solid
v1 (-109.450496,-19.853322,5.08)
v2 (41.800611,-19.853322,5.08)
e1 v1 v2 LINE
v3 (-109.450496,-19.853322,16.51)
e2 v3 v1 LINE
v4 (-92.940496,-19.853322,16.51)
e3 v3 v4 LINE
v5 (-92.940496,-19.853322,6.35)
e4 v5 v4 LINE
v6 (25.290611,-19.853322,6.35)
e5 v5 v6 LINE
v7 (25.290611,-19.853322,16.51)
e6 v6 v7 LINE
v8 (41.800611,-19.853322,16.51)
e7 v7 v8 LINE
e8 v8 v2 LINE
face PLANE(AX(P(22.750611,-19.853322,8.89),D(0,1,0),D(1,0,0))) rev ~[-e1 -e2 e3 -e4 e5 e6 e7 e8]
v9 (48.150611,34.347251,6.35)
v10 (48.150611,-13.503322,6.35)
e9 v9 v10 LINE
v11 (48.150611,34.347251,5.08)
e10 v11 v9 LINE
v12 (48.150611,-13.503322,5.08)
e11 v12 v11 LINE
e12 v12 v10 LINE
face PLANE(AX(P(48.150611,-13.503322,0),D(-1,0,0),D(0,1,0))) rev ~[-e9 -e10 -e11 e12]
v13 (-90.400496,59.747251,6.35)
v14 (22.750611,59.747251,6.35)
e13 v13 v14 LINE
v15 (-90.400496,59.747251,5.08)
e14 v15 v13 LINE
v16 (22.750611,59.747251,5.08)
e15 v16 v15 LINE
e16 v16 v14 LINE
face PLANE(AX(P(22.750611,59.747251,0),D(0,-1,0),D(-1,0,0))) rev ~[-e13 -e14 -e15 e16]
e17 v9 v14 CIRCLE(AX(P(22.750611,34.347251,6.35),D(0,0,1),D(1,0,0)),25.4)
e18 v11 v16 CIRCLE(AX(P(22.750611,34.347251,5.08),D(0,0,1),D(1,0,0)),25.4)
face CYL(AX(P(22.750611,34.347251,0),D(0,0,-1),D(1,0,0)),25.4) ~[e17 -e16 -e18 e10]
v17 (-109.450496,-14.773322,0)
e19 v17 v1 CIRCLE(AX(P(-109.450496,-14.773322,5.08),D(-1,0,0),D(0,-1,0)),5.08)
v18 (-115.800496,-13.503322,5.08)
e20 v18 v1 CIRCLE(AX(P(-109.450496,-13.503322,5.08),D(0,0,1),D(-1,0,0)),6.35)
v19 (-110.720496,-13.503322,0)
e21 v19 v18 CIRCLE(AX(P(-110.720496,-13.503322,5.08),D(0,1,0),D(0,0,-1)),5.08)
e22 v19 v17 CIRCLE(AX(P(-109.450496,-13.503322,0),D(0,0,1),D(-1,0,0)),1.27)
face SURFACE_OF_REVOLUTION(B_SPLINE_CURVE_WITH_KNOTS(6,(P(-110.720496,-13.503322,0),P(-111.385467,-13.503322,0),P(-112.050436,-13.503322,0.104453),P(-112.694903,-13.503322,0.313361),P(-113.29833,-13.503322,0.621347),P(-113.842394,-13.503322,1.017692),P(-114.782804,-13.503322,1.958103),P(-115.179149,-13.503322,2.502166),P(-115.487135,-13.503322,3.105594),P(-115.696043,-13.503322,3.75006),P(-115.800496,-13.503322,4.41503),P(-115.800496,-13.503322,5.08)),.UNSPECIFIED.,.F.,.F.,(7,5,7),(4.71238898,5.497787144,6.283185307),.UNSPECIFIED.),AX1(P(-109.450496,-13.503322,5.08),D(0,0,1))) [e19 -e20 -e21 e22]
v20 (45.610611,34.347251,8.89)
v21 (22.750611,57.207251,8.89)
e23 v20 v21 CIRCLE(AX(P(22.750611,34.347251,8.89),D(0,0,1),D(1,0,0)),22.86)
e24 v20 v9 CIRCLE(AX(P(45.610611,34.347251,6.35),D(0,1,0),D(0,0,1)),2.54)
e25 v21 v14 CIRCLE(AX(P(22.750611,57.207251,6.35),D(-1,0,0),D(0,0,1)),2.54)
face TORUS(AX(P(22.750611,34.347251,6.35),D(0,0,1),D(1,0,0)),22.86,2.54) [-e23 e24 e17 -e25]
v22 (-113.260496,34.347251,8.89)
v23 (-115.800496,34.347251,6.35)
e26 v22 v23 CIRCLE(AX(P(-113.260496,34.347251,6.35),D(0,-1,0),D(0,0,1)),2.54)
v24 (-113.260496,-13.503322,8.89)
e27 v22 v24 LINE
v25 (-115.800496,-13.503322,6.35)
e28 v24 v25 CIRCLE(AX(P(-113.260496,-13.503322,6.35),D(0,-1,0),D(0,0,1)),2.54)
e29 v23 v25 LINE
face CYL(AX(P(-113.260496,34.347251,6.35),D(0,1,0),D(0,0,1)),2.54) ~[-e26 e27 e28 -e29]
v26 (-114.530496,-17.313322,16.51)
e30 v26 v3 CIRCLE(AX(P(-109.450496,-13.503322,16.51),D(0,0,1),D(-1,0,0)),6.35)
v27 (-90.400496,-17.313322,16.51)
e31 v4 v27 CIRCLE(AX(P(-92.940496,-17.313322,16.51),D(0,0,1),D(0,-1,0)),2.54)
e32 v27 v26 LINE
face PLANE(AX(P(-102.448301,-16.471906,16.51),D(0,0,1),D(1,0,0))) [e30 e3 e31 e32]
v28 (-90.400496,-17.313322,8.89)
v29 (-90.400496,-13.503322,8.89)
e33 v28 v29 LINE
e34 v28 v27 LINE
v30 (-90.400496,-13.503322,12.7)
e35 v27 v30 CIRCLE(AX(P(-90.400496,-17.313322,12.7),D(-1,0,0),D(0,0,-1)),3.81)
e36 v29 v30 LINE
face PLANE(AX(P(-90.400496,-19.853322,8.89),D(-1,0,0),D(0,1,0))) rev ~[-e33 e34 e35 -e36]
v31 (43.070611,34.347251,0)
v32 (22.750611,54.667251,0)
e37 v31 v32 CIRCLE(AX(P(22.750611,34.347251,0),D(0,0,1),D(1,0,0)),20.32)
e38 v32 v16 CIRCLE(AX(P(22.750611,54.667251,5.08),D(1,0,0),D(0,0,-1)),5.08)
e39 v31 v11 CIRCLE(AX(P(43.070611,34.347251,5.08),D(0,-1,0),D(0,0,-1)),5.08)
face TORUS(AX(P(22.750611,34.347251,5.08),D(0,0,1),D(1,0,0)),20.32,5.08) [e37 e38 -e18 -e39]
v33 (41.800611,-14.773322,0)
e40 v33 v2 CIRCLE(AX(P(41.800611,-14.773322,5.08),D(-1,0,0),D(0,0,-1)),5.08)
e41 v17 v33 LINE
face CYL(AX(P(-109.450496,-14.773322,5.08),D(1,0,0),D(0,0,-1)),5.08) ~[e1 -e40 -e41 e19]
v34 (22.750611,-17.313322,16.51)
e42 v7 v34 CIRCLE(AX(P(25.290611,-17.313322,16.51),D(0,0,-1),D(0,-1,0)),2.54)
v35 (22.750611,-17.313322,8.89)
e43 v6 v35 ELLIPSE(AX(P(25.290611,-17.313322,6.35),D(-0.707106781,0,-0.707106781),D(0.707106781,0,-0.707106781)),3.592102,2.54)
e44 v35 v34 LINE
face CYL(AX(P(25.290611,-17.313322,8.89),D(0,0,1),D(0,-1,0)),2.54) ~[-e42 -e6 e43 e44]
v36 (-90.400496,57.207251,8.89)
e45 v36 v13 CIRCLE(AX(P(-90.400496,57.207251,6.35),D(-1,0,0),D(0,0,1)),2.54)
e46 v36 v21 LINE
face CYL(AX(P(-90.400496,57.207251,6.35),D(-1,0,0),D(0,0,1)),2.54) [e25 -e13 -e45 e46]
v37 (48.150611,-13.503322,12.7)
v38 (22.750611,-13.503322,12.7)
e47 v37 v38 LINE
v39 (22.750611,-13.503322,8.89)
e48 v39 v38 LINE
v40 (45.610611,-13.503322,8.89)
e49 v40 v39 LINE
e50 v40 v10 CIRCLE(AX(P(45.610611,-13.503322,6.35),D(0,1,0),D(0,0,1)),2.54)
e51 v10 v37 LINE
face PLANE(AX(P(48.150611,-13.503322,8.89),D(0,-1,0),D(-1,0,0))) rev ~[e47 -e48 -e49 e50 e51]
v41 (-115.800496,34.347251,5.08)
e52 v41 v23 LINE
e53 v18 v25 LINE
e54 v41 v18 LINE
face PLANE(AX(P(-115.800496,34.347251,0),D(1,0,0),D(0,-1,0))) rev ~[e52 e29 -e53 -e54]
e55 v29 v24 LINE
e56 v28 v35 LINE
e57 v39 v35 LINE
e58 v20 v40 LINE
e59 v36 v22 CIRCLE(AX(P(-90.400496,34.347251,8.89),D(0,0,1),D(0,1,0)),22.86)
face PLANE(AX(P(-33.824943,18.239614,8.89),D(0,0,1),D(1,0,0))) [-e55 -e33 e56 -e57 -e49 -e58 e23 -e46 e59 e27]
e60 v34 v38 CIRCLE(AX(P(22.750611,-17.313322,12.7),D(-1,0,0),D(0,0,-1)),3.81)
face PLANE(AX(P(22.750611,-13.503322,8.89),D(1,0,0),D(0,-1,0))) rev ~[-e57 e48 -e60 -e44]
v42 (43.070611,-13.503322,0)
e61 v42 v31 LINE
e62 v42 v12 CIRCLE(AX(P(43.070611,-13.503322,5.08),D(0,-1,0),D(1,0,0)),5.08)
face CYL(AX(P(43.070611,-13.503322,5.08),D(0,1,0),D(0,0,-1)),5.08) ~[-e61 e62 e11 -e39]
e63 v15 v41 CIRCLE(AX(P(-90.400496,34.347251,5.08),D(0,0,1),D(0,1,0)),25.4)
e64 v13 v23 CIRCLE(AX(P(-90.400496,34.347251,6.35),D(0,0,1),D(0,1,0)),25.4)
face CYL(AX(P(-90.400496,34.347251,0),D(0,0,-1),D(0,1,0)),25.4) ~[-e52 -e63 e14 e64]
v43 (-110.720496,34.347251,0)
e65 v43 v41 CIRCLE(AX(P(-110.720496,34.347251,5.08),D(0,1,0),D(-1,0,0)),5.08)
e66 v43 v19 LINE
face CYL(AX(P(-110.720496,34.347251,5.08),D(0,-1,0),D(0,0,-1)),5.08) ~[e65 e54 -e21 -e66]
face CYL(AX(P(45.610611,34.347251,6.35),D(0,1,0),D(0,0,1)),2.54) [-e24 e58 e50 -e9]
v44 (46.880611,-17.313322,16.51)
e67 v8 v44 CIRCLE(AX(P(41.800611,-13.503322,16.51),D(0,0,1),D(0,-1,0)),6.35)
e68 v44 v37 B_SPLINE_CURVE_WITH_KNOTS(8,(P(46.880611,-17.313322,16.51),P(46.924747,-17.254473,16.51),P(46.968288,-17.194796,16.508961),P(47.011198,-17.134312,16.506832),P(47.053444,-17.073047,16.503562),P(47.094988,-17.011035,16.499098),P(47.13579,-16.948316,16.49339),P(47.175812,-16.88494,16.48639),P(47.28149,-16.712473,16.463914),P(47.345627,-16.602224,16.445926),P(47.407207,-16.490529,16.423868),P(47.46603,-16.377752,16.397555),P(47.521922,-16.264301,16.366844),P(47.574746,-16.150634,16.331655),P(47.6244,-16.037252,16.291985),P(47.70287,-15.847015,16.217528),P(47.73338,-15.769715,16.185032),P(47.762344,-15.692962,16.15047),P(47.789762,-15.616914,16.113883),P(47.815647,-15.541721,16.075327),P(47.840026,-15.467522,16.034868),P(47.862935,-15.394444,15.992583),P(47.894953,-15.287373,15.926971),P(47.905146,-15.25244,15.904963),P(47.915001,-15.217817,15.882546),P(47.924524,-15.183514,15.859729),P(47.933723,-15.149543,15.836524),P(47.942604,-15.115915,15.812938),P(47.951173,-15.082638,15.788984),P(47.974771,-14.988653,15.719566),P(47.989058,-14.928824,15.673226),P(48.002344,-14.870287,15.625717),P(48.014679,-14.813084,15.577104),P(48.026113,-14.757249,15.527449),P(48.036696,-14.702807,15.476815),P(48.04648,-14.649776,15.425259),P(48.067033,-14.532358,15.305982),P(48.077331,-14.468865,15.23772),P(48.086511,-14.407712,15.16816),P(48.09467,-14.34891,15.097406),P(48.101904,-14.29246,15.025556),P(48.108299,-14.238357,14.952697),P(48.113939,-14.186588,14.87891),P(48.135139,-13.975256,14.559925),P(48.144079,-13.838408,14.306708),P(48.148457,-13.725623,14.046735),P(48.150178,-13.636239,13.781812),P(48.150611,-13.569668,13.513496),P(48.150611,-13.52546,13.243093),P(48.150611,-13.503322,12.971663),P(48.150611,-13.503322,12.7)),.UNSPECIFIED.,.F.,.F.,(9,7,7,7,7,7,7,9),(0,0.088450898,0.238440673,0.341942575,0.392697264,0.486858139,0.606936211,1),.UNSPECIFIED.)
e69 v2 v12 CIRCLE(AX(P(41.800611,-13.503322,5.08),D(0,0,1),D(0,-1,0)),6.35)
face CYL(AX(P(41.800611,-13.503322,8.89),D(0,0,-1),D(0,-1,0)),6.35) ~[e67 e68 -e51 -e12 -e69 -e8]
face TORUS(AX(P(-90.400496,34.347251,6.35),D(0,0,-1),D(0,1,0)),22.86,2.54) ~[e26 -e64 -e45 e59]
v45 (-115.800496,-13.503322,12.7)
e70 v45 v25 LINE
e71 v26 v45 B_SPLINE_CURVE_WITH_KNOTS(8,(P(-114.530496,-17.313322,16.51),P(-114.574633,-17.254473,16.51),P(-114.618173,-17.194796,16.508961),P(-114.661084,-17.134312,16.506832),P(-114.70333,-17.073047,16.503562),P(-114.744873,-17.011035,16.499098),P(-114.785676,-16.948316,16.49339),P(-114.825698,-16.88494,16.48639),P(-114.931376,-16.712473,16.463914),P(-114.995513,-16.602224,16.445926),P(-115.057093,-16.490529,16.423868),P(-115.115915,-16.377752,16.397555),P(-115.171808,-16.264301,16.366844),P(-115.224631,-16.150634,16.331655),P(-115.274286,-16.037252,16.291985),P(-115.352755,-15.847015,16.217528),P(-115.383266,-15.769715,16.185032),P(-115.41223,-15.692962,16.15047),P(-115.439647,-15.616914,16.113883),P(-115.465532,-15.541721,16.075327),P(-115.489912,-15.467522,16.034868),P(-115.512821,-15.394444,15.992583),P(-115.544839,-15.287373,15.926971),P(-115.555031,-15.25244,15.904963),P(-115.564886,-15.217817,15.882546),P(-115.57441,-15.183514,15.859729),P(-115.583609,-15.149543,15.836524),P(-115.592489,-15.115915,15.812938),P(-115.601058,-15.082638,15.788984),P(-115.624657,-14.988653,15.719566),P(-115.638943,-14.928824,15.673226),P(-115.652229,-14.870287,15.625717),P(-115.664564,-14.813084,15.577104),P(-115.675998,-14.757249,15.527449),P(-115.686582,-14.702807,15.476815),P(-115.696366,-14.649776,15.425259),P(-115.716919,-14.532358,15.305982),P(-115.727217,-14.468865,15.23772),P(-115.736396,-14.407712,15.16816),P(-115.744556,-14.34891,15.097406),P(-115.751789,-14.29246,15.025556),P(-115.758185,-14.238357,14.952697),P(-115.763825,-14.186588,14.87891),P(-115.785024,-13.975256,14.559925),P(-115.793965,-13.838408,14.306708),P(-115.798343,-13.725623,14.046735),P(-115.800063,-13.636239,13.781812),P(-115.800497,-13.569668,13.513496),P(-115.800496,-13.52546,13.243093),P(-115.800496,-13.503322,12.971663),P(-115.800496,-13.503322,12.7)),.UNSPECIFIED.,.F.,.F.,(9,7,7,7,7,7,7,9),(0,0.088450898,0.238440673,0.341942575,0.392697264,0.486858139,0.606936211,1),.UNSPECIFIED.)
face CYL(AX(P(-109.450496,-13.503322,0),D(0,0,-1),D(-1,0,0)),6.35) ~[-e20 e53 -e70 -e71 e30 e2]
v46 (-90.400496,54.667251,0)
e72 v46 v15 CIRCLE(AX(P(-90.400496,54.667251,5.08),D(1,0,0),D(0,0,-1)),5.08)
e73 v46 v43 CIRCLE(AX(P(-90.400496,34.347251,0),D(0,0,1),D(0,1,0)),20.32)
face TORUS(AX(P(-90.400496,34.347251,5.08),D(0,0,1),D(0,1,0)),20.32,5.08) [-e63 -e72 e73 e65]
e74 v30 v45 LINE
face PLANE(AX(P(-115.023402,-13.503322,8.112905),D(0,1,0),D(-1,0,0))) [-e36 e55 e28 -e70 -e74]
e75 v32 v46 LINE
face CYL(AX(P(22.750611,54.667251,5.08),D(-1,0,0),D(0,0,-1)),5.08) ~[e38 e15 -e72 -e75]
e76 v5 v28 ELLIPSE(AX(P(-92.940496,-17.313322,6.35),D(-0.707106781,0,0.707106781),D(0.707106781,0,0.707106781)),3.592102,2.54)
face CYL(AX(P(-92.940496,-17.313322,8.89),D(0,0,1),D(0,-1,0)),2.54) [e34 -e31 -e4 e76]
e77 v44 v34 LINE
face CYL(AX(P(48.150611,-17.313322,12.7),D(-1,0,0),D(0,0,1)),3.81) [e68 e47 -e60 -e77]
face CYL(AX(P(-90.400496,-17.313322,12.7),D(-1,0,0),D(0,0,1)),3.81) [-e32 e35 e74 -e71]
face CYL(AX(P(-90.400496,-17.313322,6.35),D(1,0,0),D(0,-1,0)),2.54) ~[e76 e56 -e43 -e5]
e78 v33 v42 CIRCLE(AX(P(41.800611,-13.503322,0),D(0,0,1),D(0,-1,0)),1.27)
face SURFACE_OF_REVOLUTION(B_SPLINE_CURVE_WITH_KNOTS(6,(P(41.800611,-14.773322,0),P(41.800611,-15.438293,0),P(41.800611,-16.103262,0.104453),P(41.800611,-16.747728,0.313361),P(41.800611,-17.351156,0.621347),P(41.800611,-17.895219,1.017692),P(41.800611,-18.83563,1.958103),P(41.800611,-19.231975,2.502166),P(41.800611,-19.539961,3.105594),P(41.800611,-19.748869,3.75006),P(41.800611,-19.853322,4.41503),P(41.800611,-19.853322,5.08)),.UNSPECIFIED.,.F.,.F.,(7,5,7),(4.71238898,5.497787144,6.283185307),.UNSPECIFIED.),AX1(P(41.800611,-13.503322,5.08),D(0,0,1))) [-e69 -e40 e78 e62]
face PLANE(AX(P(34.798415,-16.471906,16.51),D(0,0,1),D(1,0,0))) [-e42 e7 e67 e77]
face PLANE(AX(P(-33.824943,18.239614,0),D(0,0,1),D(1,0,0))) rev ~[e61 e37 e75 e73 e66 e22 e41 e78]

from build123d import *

# Parameters (mm, degrees)
F1_DEPTH    = 8.89
F3_DEPTH    = 7.62
F4_T1_DEPTH = 47.8505725861
F4_T3_DEPTH = 113.1511068404
F4_T6_ANGLE = 90
F4_T8_ANGLE = 90
F5_R        = 5.08
F6_R        = 3.81
F7_R        = 2.54


# Not quite as in the source:
# - a fillet or chamfer that OpenCascade refuses, or shapes differently, is made with other operations: its cross-section is extruded or revolved along the edge and cut away or added


with BuildPart() as f1:
    # F0 (on Top) → F1 (new body)
    with BuildSketch(Plane.XY):
        with BuildLine():
            Line((22.7506106496, 59.7472505152), (-90.4004961908, 59.7472505152))
            ThreePointArc((-90.4004961908, 59.7472505152), (-108.3610084329, 52.3077627574), (-115.8004961908, 34.3472505152))
            Line((-115.8004961908, 34.3472505152), (-115.8004961908, -13.5033220708))
            ThreePointArc((-115.8004961908, -13.5033220708), (-113.9406242513, -17.9934501314), (-109.4504961908, -19.8533220708))
            Line((-109.4504961908, -19.8533220708), (41.8006106496, -19.8533220708))
            ThreePointArc((41.8006106496, -19.8533220708), (46.2907387101, -17.9934501314), (48.1506106496, -13.5033220708))
            Line((48.1506106496, -13.5033220708), (48.1506106496, 34.3472505152))
            ThreePointArc((48.1506106496, 34.3472505152), (40.7111228917, 52.3077627574), (22.7506106496, 59.7472505152))
        make_face()
    extrude(amount=F1_DEPTH)

    # F2 (on face) → F3 (join)
    with BuildSketch(Plane.XY.offset(8.89)):
        with BuildLine():
            ThreePointArc((41.8006106496, -19.8533220708), (46.2907387101, -17.9934501314), (48.1506106496, -13.5033220708))
            Line((48.1506106496, -13.5033220708), (22.7506106496, -13.5033220708))
            Line((22.7506106496, -13.5033220708), (22.7506106496, -19.8533220708))
            Line((22.7506106496, -19.8533220708), (41.8006106496, -19.8533220708))
        make_face()
        with BuildLine():
            Line((-90.4004961908, -13.5033220708), (-115.8004961908, -13.5033220708))
            ThreePointArc((-115.8004961908, -13.5033220708), (-113.9406242513, -17.9934501314), (-109.4504961908, -19.8533220708))
            Line((-109.4504961908, -19.8533220708), (-90.4004961908, -19.8533220708))
            Line((-90.4004961908, -19.8533220708), (-90.4004961908, -13.5033220708))
        make_face()
    extrude(amount=F3_DEPTH)

    # F4: fillet of radius 2.54 on 1 edges, made by hand

    # F4_s2 → F4_t1 (cut)
    with BuildSketch(Plane.XZ.offset(-34.3472505152)):
        with BuildLine():
            ThreePointArc((45.6106106496, 8.89), (47.4066618738, 8.1460512242), (48.1506106496, 6.35))
            Line((48.1506106496, 6.35), (48.1506106496, 8.89))
            Line((48.1506106496, 8.89), (45.6106106496, 8.89))
        make_face()
        with BuildLine():
            ThreePointArc((-113.2604961908, 8.89), (-115.056547415, 8.1460512242), (-115.8004961908, 6.35))
            Line((-115.8004961908, 6.35), (-115.8004961908, 8.89))
            Line((-115.8004961908, 8.89), (-113.2604961908, 8.89))
        make_face()
    extrude(amount=F4_T1_DEPTH, mode=Mode.SUBTRACT)

    # F4_s4 → F4_t3 (cut)
    with BuildSketch(Plane.YZ.offset(-90.4004961908)):
        with BuildLine():
            ThreePointArc((57.2072505152, 8.89), (59.0033017394, 8.1460512242), (59.7472505152, 6.35))
            Line((59.7472505152, 6.35), (59.7472505152, 8.89))
            Line((59.7472505152, 8.89), (57.2072505152, 8.89))
        make_face()
    extrude(amount=F4_T3_DEPTH, mode=Mode.SUBTRACT)

    # F4_s5 → F4_t6 (revolve, cut)
    with BuildSketch(Plane.XZ.offset(-34.3472505152)):
        with BuildLine():
            ThreePointArc((48.1506106496, 6.35), (47.4066618738, 8.1460512242), (45.6106106496, 8.89))
            Line((45.6106106496, 8.89), (48.1506106496, 8.89))
            Line((48.1506106496, 8.89), (48.1506106496, 6.35))
        make_face()
    revolve(axis=Axis((22.7506106496, 34.3472505152, 8.89), (0, 0, 1)), revolution_arc=F4_T6_ANGLE, mode=Mode.SUBTRACT)

    # F4_s7 → F4_t8 (revolve, cut)
    with BuildSketch(Plane.YZ.offset(-90.4004961908)):
        with BuildLine():
            ThreePointArc((57.2072505152, 8.89), (59.0033017394, 8.1460512242), (59.7472505152, 6.35))
            Line((59.7472505152, 6.35), (59.7472505152, 8.89))
            Line((59.7472505152, 8.89), (57.2072505152, 8.89))
        make_face()
    revolve(axis=Axis((-90.4004961908, 34.3472505152, 8.89), (0, 0, 1)), revolution_arc=F4_T8_ANGLE, mode=Mode.SUBTRACT)

    # F5
    f5_edges = [f1.edges().sort_by_distance(p)[0] for p in [
        (-33.824943, 59.747251, 0),
    ]]
    fillet(f5_edges, radius=F5_R)

    # F6
    f6_edges = [f1.edges().sort_by_distance(p)[0] for p in [
        (35.450611, -13.503322, 16.51),
        (-103.100496, -13.503322, 16.51),
    ]]
    fillet(f6_edges, radius=F6_R)

    # F7
    f7_edges = [f1.edges().sort_by_distance(p)[0] for p in [
        (-90.400496, -19.853322, 12.7),
        (-33.824943, -19.853322, 8.89),
        (22.750611, -19.853322, 12.7),
    ]]
    fillet(f7_edges, radius=F7_R)


solid = f1.part
